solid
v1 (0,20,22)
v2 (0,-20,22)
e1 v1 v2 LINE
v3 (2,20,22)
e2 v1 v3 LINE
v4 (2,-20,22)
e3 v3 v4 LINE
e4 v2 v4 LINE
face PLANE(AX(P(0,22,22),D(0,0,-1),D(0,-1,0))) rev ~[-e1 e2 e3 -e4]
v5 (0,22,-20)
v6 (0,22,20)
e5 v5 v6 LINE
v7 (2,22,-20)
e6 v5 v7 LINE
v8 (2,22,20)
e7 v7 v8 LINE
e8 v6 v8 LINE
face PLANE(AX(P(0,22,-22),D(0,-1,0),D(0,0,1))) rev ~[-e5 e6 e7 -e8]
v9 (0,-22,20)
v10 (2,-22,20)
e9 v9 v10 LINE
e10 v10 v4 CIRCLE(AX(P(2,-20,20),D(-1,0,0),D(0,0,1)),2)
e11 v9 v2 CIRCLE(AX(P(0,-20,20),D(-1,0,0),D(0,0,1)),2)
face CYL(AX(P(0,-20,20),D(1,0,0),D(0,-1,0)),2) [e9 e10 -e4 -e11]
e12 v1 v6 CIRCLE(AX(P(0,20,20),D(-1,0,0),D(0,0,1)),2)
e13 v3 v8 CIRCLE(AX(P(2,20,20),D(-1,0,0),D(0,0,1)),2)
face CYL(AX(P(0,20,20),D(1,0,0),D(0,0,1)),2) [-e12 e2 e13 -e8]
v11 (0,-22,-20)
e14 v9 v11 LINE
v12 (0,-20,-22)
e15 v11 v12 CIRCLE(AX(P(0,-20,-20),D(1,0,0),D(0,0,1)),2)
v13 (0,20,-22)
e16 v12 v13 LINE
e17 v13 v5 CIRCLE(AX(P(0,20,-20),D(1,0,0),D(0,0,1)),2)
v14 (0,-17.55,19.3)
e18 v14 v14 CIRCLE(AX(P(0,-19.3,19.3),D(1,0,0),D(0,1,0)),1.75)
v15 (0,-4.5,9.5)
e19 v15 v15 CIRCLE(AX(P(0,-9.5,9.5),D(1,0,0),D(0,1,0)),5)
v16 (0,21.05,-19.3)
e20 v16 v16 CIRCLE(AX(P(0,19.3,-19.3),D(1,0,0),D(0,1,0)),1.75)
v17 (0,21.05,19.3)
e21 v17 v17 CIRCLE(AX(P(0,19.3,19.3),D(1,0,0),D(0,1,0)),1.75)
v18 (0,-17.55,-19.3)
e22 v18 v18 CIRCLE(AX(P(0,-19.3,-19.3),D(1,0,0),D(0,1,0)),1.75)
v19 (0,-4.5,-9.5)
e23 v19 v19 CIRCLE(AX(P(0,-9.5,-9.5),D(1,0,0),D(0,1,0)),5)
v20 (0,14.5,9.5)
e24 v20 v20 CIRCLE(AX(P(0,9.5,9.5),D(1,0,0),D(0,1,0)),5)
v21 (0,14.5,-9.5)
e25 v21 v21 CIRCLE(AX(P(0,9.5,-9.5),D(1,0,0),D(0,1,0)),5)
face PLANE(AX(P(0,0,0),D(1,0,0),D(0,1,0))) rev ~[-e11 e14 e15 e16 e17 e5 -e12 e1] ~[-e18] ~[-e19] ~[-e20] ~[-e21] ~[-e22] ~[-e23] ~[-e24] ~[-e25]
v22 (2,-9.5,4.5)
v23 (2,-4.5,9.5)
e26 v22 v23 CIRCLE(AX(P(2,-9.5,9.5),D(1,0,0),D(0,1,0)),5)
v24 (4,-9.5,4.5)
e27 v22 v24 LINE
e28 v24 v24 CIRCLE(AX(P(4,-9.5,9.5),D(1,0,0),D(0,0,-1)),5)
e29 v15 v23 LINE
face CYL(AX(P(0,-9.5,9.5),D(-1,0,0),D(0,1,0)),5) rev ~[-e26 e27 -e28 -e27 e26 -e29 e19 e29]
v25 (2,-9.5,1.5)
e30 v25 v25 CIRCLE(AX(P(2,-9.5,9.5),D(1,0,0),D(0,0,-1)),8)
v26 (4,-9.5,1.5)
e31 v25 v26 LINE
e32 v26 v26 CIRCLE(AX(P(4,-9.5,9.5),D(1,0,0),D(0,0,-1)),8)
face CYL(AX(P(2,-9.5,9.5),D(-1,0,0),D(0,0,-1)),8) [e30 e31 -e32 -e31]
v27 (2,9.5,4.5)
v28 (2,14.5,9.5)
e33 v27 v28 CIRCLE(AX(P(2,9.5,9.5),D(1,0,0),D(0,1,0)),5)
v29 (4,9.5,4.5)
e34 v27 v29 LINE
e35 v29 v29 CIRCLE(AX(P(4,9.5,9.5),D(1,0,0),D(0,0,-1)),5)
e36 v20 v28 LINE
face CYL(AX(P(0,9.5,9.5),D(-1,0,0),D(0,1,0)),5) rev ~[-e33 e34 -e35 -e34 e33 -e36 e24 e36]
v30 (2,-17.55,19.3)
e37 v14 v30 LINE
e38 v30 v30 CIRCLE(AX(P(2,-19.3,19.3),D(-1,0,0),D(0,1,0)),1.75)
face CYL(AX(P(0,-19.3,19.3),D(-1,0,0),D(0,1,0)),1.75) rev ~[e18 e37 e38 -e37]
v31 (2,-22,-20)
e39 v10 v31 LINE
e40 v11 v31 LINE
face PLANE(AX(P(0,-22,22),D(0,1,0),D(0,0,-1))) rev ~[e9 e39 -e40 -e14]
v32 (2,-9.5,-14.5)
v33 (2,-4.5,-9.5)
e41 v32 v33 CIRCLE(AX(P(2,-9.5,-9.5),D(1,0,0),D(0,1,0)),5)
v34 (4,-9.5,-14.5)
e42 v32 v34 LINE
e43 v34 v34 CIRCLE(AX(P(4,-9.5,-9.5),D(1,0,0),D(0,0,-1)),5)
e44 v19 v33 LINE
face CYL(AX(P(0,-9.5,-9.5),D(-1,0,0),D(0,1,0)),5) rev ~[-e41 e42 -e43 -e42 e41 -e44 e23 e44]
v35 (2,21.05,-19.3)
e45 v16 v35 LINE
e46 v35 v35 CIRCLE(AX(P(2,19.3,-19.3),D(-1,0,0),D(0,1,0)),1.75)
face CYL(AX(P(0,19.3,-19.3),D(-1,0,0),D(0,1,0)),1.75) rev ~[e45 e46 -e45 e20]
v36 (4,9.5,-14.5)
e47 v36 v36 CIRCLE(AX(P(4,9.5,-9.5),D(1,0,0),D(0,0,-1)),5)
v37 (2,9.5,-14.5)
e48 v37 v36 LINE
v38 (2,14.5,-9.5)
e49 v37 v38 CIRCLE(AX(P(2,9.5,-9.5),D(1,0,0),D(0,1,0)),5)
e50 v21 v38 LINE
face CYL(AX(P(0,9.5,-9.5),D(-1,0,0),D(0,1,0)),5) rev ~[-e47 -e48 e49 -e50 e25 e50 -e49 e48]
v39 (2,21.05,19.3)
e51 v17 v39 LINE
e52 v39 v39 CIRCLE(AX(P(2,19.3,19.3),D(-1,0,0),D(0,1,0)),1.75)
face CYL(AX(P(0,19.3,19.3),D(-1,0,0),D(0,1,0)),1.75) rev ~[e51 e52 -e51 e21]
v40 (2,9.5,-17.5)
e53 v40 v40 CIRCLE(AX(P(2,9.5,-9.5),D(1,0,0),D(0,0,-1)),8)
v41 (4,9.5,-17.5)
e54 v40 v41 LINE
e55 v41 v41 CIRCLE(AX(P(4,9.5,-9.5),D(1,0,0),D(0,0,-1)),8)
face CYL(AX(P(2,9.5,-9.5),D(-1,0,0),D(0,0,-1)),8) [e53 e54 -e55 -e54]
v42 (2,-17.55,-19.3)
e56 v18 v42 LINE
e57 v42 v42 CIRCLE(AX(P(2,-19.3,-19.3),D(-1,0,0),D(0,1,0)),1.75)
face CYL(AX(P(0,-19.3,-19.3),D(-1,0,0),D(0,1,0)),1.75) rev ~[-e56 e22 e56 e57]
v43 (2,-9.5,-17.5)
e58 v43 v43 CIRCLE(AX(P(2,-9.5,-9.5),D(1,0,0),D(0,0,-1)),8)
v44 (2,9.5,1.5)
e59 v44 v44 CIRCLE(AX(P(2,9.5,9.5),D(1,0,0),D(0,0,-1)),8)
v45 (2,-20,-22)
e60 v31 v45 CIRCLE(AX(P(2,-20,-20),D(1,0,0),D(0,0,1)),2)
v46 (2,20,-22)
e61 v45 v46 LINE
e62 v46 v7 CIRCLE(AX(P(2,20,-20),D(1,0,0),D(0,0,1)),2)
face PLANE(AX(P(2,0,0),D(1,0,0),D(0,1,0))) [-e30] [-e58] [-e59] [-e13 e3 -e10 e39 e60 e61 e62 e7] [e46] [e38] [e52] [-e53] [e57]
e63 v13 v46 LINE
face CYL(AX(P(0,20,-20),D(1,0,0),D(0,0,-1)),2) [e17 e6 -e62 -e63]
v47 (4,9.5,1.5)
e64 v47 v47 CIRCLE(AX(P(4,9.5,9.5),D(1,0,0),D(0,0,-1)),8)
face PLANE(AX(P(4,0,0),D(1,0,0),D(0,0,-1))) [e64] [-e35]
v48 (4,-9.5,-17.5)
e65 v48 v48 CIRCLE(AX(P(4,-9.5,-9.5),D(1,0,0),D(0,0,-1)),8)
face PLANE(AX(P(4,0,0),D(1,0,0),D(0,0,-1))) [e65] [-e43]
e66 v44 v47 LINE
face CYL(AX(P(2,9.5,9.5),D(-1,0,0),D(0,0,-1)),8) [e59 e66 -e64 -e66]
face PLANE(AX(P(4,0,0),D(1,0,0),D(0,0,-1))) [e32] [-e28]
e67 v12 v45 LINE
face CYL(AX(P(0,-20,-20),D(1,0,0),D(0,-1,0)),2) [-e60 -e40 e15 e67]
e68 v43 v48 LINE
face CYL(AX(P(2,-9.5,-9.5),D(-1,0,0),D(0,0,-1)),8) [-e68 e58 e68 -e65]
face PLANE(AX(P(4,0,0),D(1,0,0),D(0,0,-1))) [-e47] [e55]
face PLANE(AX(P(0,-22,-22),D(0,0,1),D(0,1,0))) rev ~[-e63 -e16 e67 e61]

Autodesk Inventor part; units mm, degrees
ref_plane "YZ Plane" through (0, 0, 0) normal (1, 0, 0) x (0, 1, 0)
ref_plane "XZ Plane" through (0, 0, 0) normal (0, 1, 0) x (-1, 0, 0)
ref_plane "XY Plane" through (0, 0, 0) normal (0, 0, 1) x (1, 0, 0)
sketch "Sketch1" plane through (0, 0, 0) normal (1, 0, 0) x (0, 1, 0)
  line L0 (-22, -22) -> (22, -22)
  line L1 (22, -22) -> (22, 22)
  line L2 (22, 22) -> (-22, 22)
  line L3 (-22, 22) -> (-22, -22)
  line L4 (-22, -22) -> (22, 22) construction
  line L5 (22, -22) -> (-22, 22) construction
  line L6 (-19.3, -19.3) -> (19.3, -19.3)
  line L7 (19.3, -19.3) -> (19.3, 19.3)
  line L8 (19.3, 19.3) -> (-19.3, 19.3)
  line L9 (-19.3, 19.3) -> (-19.3, -19.3)
  line L10 (-19.3, -19.3) -> (19.3, 19.3) construction
  line L11 (19.3, -19.3) -> (-19.3, 19.3) construction
  circle A0 centre (19.3, 19.3) radius 1.75
  circle A1 centre (19.3, -19.3) radius 1.75
  circle A2 centre (-19.3, -19.3) radius 1.75
  circle A3 centre (-19.3, 19.3) radius 1.75
  line L12 (19.3, 0) -> (0, 0)
  circle A4 centre (9.5, -9.5) radius 5
  circle A5 centre (9.5, 9.5) radius 5
  line L13 (0, 0) -> (-19.3, 0)
  circle A6 centre (-9.5, -9.5) radius 5
  circle A7 centre (-9.5, 9.5) radius 5
  circle A8 centre (9.5, -9.5) radius 9.5
  circle A9 centre (9.5, 9.5) radius 9.5
  circle A10 centre (-9.5, 9.5) radius 9.5
  circle A11 centre (-9.5, -9.5) radius 9.5
  point P0 (0, 0)
  point P1 (0, 0)
  point P2 (6.364, 6.364)
  dimension "d0" = 44
  dimension "d1" = 44
  dimension "d6" = 38.6
  dimension "d7" = 38.6
  dimension "d8" = 3.5
  dimension "d9" = 3.5
  dimension "d10" = 3.5
  dimension "d11" = 3.5
  dimension "d19" = 10
  dimension "d20" = 10
  dimension "d21" = 10
  dimension "d22" = 10
  dimension "d23" = 19
  dimension "d24" = 19
  dimension "d25" = 19
  dimension "d26" = 19
extrude "Extrusion1" add sketch "Sketch1" along normal blind 2 contours L3 L2 L1 L0 | A2 L9 L13 A11 A8 L12 L7 A1 L6 | L9 A3 L8 A0 L7 L12 A9 A10 L13 | A10 A9 L12 L13 | A10 | L13 L12 A8 A11 | A11 | A9 | A8
fillet "Fillet1" radius 2 4 edges at (1, -22, 22) (1, -22, -22) (1, 22, -22) (1, 22, 22)
sketch "Sketch2" plane through (2, 0, 0) normal (1, 0, 0) x (0, 0, -1)
  arc A0 (-20, 22) -> (-22, 20) centre (-20, 20) ccw projected
  line L0 (-22, 20) -> (-22, -20) projected
  arc A1 (-22, -20) -> (-20, -22) centre (-20, -20) ccw projected
  line L1 (-20, -22) -> (20, -22) projected
  arc A2 (20, -22) -> (22, -20) centre (20, -20) ccw projected
  line L2 (22, -20) -> (22, 20) projected
  arc A3 (22, 20) -> (20, 22) centre (20, 20) ccw projected
  line L3 (20, 22) -> (-20, 22) projected
  circle A4 centre (-19.3, -19.3) radius 1.75 projected
  circle A5 centre (19.3, -19.3) radius 1.75 projected
  circle A6 centre (9.5, 9.5) radius 5 projected
  circle A7 centre (9.5, -9.5) radius 5 projected
  circle A8 centre (19.3, 19.3) radius 1.75 projected
  circle A9 centre (-9.5, 9.5) radius 5 projected
  circle A10 centre (-9.5, -9.5) radius 5 projected
  circle A11 centre (-19.3, 19.3) radius 1.75 projected
  circle A12 centre (-9.5, -9.5) radius 8
  circle A13 centre (-9.5, 9.5) radius 8
  circle A14 centre (9.5, 9.5) radius 8
  circle A15 centre (9.5, -9.5) radius 8
  point P0 (0, 0)
  dimension "d27" = 16
  dimension "d28" = 16
  dimension "d29" = 16
  dimension "d30" = 16
extrude "Extrusion2" add sketch "Sketch2" along normal blind 2 contours A12 | A13 | A14 | A15
properties part number "BatteryRoof" material "ABS Plastic"
